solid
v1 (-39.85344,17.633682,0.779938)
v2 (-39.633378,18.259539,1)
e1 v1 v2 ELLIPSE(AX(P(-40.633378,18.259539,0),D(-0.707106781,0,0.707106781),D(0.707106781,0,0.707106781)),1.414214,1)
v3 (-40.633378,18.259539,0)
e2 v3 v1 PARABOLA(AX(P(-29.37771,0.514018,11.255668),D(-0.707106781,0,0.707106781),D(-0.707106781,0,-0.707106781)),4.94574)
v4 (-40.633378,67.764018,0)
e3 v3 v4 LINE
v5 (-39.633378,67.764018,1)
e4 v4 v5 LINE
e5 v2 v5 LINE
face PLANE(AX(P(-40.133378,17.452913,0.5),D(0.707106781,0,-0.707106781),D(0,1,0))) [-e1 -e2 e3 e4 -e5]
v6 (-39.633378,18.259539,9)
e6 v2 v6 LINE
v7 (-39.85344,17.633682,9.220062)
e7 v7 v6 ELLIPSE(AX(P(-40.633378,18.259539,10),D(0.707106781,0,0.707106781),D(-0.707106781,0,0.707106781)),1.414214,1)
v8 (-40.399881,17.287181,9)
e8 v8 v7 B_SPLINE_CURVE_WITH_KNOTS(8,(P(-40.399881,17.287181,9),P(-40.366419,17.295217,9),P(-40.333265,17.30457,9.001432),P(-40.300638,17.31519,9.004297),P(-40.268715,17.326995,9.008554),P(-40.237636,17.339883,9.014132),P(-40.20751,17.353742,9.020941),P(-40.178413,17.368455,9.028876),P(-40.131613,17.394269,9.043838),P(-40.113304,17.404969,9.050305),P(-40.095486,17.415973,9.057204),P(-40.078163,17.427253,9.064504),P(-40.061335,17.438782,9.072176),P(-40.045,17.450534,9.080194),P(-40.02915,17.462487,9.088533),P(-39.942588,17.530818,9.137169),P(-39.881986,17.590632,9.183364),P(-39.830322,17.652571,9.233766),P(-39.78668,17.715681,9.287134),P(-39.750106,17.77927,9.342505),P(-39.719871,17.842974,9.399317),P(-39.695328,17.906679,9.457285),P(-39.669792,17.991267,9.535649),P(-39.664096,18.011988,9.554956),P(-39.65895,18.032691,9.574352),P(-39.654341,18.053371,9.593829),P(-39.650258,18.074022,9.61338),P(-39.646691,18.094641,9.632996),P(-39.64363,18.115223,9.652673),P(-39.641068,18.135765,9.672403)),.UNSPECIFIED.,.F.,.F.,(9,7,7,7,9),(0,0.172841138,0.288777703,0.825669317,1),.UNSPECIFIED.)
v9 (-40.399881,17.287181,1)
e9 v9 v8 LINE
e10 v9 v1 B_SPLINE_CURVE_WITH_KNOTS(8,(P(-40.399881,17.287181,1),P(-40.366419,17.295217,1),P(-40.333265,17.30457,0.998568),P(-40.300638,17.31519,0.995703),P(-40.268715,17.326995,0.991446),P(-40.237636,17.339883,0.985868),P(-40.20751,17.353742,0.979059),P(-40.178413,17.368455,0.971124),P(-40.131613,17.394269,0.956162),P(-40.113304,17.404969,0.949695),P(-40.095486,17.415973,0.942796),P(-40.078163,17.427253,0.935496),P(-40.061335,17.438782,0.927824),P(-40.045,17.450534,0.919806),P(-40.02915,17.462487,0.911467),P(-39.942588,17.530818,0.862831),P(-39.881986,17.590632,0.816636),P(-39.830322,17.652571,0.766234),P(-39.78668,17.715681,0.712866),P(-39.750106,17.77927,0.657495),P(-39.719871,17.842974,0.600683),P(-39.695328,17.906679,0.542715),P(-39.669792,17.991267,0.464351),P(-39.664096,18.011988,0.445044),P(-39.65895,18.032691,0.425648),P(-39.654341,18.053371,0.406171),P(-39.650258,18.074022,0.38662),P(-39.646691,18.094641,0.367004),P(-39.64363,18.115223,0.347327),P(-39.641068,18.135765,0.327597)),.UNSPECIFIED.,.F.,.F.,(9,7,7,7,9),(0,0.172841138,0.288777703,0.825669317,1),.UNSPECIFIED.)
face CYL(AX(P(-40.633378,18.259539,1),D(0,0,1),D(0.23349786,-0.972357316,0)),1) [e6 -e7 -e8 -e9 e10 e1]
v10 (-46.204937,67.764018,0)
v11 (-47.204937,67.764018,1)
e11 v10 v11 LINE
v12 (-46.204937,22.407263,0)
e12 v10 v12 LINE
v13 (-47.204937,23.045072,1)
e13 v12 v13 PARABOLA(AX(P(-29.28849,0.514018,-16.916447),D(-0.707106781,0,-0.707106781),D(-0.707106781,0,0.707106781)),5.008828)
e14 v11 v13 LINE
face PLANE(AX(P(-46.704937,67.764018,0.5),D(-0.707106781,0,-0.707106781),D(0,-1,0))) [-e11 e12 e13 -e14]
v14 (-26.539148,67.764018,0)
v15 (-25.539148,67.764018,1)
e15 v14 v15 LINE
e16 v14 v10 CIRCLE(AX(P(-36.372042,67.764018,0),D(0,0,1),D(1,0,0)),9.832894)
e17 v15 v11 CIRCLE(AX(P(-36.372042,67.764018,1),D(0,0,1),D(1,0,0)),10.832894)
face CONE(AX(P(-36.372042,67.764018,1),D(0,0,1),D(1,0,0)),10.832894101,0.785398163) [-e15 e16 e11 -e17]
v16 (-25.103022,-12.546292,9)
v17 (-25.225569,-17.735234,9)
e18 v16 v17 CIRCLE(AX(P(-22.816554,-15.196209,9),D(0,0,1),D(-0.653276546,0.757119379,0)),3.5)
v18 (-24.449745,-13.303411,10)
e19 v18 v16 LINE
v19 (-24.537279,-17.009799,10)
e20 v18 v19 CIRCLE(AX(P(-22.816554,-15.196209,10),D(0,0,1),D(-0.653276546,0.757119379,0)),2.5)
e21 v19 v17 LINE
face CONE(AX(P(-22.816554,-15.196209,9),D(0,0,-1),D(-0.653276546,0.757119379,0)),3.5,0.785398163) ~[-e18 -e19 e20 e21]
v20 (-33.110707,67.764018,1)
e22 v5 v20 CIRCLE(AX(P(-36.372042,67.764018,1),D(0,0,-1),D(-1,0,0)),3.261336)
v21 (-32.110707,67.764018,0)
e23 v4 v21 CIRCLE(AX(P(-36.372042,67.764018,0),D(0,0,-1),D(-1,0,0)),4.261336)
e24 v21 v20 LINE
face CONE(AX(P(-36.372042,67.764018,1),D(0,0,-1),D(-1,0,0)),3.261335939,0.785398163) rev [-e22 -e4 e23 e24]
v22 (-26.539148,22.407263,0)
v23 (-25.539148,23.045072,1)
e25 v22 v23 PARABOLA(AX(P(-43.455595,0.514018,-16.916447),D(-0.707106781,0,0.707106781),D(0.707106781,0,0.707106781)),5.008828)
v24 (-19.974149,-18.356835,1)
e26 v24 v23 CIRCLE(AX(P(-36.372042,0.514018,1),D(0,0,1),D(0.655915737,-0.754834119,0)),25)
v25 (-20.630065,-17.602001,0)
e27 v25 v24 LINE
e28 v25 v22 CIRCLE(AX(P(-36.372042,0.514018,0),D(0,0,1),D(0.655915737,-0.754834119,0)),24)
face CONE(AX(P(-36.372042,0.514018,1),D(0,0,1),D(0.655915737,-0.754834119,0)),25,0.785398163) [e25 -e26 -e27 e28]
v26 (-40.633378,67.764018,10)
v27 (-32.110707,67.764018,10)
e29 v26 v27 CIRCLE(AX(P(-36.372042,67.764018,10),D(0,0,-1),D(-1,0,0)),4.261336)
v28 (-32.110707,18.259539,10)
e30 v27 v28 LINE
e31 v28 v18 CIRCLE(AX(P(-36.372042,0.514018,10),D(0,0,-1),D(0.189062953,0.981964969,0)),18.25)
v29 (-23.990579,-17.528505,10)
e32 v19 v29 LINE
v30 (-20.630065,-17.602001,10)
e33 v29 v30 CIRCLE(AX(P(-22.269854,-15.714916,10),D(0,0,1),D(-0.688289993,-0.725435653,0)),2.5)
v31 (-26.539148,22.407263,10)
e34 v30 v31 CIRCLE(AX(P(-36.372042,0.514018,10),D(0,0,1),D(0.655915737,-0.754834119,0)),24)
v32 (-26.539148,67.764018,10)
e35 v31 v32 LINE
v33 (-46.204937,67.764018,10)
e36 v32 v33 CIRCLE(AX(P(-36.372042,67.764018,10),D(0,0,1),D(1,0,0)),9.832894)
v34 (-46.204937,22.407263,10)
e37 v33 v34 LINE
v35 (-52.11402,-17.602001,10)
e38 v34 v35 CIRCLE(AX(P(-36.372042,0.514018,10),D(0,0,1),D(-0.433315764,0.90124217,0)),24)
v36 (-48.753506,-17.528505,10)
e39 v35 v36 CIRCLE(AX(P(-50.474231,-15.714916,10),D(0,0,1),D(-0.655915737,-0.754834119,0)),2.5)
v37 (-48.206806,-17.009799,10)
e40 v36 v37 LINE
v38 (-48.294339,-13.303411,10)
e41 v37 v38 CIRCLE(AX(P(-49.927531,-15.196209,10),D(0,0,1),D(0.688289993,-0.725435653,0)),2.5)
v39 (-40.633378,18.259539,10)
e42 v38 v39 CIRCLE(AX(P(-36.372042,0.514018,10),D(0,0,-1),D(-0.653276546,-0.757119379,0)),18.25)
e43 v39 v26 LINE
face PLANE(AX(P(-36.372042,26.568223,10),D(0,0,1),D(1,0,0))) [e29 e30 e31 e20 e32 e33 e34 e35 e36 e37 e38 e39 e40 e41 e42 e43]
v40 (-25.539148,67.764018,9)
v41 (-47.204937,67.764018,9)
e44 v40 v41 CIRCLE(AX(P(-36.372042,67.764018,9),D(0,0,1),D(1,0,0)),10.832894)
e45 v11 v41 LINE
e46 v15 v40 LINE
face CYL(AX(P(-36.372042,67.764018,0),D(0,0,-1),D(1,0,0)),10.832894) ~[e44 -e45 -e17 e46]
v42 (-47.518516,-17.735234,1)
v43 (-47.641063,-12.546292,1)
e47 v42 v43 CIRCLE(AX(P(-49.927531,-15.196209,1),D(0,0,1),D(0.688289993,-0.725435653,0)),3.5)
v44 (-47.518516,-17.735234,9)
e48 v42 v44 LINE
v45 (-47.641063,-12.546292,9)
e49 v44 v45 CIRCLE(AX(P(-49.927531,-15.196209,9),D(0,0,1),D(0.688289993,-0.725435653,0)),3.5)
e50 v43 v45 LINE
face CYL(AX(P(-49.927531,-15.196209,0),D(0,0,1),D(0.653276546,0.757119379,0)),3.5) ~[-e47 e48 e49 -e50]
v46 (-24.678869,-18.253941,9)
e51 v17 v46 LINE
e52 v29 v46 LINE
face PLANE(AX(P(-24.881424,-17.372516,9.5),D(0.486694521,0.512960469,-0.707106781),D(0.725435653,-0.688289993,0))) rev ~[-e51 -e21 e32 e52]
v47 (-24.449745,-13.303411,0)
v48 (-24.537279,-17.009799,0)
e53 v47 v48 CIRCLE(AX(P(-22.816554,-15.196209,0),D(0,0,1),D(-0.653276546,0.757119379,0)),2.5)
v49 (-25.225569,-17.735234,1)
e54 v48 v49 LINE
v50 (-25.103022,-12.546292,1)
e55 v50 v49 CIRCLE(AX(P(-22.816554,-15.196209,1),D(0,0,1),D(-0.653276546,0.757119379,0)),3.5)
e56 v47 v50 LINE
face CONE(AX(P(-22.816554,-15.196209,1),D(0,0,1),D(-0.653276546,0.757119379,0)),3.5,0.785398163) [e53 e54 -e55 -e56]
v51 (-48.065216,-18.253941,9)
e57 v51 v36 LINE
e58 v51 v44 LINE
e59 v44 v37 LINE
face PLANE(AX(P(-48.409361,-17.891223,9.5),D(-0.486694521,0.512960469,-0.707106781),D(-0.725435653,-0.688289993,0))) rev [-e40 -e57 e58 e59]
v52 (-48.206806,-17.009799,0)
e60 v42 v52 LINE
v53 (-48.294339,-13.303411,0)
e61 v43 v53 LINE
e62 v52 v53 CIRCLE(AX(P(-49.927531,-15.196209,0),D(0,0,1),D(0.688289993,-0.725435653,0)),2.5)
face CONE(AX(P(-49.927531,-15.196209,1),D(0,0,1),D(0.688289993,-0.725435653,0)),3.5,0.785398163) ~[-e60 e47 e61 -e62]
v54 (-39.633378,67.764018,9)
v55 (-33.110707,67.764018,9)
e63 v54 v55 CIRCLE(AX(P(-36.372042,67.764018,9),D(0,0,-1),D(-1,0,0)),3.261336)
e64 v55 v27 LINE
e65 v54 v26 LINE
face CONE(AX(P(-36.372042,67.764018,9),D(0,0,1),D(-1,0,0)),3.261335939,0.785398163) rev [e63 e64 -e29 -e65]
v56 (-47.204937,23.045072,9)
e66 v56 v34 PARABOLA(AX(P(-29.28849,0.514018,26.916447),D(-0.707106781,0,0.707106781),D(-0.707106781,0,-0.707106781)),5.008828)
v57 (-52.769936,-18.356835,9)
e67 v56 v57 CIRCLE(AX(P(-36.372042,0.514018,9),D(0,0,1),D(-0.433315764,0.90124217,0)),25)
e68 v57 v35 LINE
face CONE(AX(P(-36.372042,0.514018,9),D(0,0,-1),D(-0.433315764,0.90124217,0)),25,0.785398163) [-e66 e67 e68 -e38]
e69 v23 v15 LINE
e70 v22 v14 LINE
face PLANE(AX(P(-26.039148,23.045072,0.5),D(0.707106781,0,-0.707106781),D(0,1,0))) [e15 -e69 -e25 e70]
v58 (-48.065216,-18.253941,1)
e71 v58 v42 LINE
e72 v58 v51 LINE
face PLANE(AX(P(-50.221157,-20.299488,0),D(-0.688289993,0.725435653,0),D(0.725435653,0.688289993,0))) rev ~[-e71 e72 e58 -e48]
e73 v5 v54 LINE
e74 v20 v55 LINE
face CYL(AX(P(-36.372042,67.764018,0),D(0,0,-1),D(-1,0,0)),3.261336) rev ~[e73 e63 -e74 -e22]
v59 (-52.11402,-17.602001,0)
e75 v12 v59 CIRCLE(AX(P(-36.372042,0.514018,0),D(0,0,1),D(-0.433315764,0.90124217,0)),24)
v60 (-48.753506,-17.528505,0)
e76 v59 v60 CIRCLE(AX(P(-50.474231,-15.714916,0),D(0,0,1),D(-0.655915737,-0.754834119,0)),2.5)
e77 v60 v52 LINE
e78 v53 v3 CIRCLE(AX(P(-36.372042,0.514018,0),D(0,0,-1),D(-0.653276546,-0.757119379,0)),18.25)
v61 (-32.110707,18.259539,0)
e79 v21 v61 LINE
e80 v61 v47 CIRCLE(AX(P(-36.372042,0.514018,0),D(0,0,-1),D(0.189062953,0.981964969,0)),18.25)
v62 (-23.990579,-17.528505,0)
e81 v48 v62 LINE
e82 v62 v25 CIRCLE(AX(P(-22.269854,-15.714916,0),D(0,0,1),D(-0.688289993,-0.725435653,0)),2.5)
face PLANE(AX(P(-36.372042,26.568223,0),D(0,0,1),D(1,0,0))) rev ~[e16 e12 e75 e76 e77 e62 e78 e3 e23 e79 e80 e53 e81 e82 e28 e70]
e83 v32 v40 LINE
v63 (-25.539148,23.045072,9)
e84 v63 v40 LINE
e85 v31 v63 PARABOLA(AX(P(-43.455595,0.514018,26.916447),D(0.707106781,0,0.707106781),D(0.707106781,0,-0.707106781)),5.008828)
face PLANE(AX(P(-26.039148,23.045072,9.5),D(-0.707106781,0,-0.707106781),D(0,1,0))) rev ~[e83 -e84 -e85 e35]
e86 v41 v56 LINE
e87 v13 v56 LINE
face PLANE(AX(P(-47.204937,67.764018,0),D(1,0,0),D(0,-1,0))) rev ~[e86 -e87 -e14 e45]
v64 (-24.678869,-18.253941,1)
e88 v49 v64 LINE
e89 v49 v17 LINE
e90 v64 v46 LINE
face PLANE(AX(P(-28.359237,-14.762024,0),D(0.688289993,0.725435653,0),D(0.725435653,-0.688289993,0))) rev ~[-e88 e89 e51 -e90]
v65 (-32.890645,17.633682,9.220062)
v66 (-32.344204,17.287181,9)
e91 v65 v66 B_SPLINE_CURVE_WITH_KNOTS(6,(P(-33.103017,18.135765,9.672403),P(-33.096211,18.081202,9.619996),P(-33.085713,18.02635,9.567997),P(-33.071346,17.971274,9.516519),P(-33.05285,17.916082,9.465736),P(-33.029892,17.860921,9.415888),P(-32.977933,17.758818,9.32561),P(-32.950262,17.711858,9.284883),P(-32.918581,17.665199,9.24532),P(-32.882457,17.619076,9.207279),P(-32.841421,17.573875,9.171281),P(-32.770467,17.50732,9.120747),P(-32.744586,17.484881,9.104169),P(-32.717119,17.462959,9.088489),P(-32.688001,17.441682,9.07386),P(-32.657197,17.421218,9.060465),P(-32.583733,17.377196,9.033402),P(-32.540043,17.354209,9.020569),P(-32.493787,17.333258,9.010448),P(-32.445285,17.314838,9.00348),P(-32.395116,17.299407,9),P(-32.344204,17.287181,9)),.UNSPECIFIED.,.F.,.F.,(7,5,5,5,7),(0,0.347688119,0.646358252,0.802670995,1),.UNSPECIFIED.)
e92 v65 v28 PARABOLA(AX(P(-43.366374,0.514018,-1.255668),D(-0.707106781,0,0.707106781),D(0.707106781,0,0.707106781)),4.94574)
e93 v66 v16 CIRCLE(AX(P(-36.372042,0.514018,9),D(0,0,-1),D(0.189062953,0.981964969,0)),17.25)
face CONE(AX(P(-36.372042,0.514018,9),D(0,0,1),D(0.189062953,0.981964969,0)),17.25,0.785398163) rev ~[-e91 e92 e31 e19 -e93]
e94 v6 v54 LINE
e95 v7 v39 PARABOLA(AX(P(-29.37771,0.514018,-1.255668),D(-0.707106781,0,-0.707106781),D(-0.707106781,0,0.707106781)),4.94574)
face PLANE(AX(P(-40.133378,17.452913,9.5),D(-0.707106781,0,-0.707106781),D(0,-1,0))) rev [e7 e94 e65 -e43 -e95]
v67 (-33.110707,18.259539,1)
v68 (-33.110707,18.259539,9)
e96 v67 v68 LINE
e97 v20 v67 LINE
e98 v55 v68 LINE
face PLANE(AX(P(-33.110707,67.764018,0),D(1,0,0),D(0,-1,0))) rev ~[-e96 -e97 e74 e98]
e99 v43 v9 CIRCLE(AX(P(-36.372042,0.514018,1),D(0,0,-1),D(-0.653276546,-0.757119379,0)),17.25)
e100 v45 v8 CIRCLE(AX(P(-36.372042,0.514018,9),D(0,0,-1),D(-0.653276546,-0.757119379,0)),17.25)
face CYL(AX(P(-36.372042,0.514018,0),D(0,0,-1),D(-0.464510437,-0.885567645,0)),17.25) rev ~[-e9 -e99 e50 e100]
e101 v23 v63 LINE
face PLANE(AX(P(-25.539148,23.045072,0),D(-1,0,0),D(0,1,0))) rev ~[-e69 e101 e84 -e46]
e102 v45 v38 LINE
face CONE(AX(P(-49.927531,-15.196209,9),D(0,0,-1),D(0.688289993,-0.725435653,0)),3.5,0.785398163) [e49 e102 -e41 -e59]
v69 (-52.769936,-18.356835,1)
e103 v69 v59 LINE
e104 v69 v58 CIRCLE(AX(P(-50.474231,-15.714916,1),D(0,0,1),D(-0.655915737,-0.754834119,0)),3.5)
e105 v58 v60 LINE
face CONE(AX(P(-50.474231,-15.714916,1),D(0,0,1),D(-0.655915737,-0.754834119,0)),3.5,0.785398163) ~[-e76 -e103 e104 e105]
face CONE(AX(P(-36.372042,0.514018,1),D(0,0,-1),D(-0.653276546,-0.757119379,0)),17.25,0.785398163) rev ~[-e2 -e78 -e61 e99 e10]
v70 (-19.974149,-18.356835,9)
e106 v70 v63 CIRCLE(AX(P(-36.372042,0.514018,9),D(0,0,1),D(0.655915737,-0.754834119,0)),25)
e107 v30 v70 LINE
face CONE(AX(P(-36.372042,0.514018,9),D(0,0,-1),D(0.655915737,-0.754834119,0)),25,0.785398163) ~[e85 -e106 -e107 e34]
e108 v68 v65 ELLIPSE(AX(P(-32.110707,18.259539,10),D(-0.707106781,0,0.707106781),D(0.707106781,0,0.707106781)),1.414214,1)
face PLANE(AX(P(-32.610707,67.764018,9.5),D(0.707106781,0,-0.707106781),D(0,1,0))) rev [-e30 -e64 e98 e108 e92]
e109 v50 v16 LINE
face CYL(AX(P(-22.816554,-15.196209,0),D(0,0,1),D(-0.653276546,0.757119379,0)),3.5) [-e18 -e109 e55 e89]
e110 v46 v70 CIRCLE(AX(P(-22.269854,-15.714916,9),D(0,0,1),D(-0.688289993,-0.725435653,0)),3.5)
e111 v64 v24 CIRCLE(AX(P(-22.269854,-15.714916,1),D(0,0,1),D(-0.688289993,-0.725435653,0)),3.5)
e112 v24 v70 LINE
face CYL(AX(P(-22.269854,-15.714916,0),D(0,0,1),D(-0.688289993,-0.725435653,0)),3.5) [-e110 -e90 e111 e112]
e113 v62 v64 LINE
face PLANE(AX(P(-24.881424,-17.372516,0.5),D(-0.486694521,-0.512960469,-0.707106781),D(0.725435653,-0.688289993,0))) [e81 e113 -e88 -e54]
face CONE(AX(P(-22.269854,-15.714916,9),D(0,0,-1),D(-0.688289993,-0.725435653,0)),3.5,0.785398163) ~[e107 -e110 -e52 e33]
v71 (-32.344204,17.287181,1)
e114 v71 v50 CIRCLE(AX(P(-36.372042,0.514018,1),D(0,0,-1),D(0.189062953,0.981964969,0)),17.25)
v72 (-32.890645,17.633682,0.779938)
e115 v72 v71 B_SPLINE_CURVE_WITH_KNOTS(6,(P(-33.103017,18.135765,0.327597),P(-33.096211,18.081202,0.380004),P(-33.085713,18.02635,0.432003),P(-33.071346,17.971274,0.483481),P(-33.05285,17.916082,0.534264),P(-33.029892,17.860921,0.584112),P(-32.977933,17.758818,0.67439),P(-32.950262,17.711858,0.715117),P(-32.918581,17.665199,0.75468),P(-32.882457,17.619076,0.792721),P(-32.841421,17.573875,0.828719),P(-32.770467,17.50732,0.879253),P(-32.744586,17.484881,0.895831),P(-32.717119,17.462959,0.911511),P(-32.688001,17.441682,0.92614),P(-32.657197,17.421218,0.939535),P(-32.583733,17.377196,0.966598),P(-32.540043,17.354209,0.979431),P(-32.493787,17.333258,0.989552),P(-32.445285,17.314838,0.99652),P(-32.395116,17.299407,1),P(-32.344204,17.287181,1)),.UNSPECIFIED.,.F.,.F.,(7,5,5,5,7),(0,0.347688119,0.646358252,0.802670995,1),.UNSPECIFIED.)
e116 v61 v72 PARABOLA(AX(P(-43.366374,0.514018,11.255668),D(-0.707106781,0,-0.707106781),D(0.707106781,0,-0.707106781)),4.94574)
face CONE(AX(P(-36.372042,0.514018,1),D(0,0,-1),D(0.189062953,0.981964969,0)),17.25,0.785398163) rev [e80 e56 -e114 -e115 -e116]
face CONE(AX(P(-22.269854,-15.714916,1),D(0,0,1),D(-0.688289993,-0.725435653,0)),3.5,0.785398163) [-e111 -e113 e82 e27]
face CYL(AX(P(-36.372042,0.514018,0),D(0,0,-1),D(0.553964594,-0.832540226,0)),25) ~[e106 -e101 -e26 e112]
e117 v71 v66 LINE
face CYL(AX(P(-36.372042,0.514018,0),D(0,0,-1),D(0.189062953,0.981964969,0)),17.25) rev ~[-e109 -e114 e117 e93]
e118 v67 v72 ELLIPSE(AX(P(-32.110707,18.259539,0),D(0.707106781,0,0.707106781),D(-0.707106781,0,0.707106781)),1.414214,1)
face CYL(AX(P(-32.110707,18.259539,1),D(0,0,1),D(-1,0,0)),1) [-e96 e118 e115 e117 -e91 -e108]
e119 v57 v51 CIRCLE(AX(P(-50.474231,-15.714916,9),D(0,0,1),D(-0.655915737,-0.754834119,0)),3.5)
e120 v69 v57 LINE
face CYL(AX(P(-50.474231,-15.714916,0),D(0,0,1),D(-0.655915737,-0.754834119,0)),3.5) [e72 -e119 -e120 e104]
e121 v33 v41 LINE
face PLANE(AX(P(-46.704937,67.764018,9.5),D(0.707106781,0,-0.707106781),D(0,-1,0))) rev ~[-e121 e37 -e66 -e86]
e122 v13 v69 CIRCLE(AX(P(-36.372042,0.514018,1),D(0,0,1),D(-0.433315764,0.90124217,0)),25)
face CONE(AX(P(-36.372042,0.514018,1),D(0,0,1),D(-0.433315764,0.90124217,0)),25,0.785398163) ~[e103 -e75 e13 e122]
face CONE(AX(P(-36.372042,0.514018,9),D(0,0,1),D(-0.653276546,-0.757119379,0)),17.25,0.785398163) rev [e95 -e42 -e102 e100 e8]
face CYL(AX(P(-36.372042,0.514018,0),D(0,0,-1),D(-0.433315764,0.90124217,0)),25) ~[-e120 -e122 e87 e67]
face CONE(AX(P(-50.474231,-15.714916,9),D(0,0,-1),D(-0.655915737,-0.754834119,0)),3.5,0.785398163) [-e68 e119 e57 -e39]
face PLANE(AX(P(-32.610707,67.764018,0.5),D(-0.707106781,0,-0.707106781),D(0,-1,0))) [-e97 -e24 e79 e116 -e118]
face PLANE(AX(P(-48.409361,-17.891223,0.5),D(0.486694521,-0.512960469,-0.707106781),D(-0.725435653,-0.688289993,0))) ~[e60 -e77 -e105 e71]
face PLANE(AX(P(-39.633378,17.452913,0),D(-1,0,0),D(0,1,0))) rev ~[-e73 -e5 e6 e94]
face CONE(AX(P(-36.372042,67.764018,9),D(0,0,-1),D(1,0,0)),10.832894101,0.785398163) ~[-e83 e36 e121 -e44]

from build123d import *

# Parameters (mm, degrees)
F1_DEPTH = 10
F2_R     = 3.5
F3_SIZE  = 1
F4_R     = 1


# Not quite as in the source:
# - a feature names something its author has since deleted; it is built from what else it names


with BuildPart() as f1:
    # F0 (on Top) → F1 (new body)
    with BuildSketch(Plane.XY):
        with BuildLine():
            ThreePointArc((-44.3848475016, -14.7620242305), (-53.4374201274, 3.0310367894), (-39.6333784075, 17.4529133594))
            Line((-39.6333784075, 17.4529133594), (-39.6333784075, 67.7640176489))
            ThreePointArc((-39.6333784075, 67.7640176489), (-36.3720424684, 71.025353588), (-33.1107065292, 67.7640176489))
            Line((-33.1107065292, 67.7640176489), (-33.1107065292, 17.4529133594))
            ThreePointArc((-33.1107065292, 17.4529133594), (-19.3066648093, 3.0310367894), (-28.3592374351, -14.7620242305))
            Line((-28.3592374351, -14.7620242305), (-22.5229276093, -20.2994880054))
            ThreePointArc((-22.5229276093, -20.2994880054), (-11.4323530197, 2.249497469), (-25.5391483675, 23.0450718941))
            Line((-25.5391483675, 23.0450718941), (-25.5391483675, 67.7640176489))
            ThreePointArc((-25.5391483675, 67.7640176489), (-36.3720424684, 78.5969117497), (-47.2049365692, 67.7640176489))
            Line((-47.2049365692, 67.7640176489), (-47.2049365692, 23.0450718941))
            ThreePointArc((-47.2049365692, 23.0450718941), (-61.311731917, 2.249497469), (-50.2211573274, -20.2994880054))
            Line((-50.2211573274, -20.2994880054), (-44.3848475016, -14.7620242305))
        make_face()
    extrude(amount=F1_DEPTH)

    # F2
    f2_edges = [f1.edges().sort_by_distance(p)[0] for p in [
        (-50.221157, -20.299488, 5),
        (-44.384848, -14.762024, 5),
        (-28.359237, -14.762024, 5),
        (-22.522928, -20.299488, 5),
    ]]
    fillet(f2_edges, radius=F2_R)

    # F3
    f3_edges = [f1.edges().sort_by_distance(p)[0] for p in [
        (-53.038502, 4.962794, 10),
        (-61.149218, 3.844419, 10),
        (-47.204937, 45.404545, 10),
        (-39.633378, 42.608466, 10),
        (-36.372042, 78.596912, 10),
        (-36.372042, 71.025354, 10),
        (-33.110707, 42.608466, 10),
        (-25.539148, 45.404545, 10),
        (-19.705582, 4.962794, 10),
        (-11.594867, 3.844419, 0),
        (-25.539148, 45.404545, 0),
        (-39.633378, 42.608466, 0),
        (-53.038502, 4.962794, 0),
    ]]
    chamfer(f3_edges, length=F3_SIZE)

    # F4
    f4_edges = [f1.edges().sort_by_distance(p)[0] for p in [
        (-39.633378, 17.452913, 5),
        (-33.110707, 17.452913, 5),
    ]]
    fillet(f4_edges, radius=F4_R)


solid = f1.part
